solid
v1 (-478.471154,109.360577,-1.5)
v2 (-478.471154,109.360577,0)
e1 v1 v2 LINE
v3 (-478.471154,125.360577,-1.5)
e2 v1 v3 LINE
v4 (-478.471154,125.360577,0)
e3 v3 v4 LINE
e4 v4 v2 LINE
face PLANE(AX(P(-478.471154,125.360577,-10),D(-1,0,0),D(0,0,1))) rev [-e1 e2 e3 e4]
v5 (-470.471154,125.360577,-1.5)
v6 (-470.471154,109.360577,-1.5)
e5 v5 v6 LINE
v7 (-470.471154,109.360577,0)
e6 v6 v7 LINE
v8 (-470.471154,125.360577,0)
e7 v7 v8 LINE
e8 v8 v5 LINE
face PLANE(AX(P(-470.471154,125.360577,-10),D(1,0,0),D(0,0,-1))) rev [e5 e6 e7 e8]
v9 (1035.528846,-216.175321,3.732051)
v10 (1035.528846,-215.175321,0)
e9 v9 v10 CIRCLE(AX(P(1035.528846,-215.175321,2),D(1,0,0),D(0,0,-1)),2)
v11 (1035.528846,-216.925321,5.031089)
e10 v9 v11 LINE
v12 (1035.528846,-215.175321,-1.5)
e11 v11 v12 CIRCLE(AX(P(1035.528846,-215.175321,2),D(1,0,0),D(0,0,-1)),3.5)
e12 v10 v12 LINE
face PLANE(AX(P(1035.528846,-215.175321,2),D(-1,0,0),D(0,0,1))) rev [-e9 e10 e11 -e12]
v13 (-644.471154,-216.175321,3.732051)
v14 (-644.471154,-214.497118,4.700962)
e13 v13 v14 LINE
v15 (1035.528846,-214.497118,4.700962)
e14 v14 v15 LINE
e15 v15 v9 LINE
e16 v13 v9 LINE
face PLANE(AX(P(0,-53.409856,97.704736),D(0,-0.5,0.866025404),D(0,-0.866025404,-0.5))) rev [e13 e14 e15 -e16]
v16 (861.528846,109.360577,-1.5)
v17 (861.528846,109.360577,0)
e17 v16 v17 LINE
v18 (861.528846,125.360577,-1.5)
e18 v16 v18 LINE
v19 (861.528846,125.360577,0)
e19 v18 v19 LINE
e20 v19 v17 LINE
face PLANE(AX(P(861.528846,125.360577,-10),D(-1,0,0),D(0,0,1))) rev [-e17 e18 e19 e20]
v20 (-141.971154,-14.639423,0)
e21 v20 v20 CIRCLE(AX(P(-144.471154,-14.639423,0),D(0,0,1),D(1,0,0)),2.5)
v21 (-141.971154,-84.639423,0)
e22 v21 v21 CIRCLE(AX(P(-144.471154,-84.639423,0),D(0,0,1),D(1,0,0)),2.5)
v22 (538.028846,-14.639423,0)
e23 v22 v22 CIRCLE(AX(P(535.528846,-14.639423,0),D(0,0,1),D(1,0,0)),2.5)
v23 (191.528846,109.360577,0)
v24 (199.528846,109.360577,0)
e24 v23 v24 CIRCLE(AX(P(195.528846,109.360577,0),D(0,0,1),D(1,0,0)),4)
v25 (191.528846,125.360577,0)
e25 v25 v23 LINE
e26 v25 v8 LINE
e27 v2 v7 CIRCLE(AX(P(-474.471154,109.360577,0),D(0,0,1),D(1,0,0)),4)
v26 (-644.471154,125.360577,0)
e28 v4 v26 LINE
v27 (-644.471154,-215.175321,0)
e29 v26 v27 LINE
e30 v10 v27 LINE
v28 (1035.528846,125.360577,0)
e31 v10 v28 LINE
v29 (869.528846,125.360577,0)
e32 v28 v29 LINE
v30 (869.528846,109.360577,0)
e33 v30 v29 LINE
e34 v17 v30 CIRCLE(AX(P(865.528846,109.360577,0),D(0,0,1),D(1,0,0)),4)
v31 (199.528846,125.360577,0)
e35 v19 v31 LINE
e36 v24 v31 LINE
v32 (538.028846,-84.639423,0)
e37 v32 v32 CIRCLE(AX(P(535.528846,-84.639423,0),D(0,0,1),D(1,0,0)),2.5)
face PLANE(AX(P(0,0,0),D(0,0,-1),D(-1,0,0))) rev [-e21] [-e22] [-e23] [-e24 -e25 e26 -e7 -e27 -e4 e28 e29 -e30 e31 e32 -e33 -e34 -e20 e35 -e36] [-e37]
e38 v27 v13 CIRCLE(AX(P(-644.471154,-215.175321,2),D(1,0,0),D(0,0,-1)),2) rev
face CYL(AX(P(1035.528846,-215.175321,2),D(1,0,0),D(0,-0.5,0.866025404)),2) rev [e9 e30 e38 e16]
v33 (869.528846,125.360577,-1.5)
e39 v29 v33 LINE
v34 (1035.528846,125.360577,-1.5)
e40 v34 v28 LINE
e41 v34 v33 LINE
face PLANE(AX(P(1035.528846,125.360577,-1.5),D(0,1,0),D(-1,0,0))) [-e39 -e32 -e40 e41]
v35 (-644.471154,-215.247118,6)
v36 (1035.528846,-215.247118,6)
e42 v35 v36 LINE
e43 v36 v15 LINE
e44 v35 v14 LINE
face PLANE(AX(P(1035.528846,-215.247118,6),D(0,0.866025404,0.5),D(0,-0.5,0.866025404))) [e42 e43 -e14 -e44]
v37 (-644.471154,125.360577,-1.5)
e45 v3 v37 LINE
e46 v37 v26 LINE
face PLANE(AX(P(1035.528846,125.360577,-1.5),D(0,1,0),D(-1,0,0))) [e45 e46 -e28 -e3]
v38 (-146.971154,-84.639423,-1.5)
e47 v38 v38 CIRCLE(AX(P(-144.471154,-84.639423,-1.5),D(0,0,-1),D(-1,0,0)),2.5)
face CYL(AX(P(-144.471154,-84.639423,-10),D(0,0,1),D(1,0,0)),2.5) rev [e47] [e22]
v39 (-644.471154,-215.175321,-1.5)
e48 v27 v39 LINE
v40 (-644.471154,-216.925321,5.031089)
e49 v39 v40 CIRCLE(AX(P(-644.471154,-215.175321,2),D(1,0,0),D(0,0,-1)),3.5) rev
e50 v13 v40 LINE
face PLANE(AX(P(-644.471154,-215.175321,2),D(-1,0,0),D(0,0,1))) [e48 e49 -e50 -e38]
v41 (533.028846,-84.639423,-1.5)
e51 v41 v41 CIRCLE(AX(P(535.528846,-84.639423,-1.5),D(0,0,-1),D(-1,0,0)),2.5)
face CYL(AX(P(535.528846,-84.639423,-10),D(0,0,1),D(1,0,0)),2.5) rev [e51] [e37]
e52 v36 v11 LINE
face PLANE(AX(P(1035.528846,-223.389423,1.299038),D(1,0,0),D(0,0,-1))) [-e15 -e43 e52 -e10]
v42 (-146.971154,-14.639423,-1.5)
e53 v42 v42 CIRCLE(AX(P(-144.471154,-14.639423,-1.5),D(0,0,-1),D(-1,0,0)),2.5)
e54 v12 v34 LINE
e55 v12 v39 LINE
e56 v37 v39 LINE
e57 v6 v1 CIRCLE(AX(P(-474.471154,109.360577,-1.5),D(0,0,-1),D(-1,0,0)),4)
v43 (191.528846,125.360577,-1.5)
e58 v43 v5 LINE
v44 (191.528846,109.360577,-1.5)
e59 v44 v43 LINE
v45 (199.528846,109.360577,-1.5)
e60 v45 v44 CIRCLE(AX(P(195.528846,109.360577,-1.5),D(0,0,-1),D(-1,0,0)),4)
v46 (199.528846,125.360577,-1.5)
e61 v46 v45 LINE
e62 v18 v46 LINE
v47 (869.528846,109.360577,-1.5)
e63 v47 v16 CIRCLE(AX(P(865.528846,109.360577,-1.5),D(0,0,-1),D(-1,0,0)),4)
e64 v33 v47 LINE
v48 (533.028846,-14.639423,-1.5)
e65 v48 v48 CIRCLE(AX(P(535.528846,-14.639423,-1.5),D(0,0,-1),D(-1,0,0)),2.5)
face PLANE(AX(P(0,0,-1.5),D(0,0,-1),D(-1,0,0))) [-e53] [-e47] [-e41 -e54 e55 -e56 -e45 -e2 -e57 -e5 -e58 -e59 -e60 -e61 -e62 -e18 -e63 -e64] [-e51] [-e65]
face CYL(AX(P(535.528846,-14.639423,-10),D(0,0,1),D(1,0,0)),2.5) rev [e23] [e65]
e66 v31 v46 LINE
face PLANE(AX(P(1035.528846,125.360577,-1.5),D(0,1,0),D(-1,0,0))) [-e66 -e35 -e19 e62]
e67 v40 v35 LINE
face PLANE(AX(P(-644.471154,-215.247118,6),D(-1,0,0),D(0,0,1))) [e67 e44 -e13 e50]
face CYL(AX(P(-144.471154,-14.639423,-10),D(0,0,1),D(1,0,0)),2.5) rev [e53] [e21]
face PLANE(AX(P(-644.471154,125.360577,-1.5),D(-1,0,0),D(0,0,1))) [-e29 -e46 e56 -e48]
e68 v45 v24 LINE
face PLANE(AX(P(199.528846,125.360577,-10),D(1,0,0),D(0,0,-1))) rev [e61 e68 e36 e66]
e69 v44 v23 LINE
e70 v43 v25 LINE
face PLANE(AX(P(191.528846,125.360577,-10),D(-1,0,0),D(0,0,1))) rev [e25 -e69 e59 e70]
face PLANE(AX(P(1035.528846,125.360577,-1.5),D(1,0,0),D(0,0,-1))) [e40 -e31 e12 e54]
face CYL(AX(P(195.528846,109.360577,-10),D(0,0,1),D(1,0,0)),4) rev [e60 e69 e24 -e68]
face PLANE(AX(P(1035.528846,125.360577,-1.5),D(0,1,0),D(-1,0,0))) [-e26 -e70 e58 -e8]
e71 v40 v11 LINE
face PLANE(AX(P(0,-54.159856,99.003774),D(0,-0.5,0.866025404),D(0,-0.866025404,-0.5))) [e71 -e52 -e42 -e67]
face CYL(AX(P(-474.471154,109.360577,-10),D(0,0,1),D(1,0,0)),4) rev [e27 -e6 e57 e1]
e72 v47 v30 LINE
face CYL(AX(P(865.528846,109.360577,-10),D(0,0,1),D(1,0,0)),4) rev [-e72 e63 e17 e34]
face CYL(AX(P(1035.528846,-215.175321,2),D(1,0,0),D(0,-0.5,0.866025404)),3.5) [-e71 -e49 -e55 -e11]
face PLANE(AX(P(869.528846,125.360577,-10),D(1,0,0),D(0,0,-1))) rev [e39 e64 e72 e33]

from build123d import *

# Parameters (mm, degrees)
SKETCH1_W            = 1680
SKETCH1_H            = 351
BASE_FLANGE1_DEPTH   = 1.5
EDGE_FLANGE1_START   = -644.471153846
EDGE_FLANGE1_DEPTH   = 1680
EDGE_FLANGE1_2_DEPTH = 1680
SKETCH9_R            = 2.5
CUT_EXTRUDE1_DEPTH   = 10


# Read off the part's stored shape, not the designer's step: Edge-Flange1
# Sheet-metal steps are written as plain solids
with BuildPart() as part:
    # Sketch1 → Base-Flange1 (new body)
    with BuildSketch(Plane.XY):
        with Locations((195.528846154, -50.139423077)):
            Rectangle(SKETCH1_W, SKETCH1_H)
    extrude(amount=-BASE_FLANGE1_DEPTH)

    # Edge-Flange1 outline → Edge-Flange1 (cut)
    with BuildSketch(Plane.YZ.offset(EDGE_FLANGE1_START)):
        with BuildLine():
            ThreePointArc((-215.175321462, -1.5), (-216.795506637, -1.102418412), (-218.047602785, 0))
            Line((-218.047602785, 0), (-225.639423077, 0))
            Line((-225.639423077, 0), (-225.639423077, -1.5))
            Line((-225.639423077, -1.5), (-215.175321462, -1.5))
        make_face()
    extrude(amount=EDGE_FLANGE1_DEPTH, mode=Mode.SUBTRACT)

    # Edge-Flange1 2 outline → Edge-Flange1 2 (add)
    with BuildSketch(Plane.YZ.offset(EDGE_FLANGE1_START)):
        with BuildLine():
            Line((-215.247118232, 6), (-216.925321462, 5.031088913))
            ThreePointArc((-216.925321462, 5.031088913), (-218.591362309, 2.762013733), (-218.047602785, 0))
            Line((-218.047602785, 0), (-215.175321462, 0))
            ThreePointArc((-215.175321462, 0), (-217.107173114, 1.48236191), (-216.175321462, 3.732050808))
            Line((-216.175321462, 3.732050808), (-214.497118232, 4.700961894))
            Line((-214.497118232, 4.700961894), (-215.247118232, 6))
        make_face()
    extrude(amount=EDGE_FLANGE1_2_DEPTH)

    # Sketch9 → Cut-Extrude1 (cut)
    with BuildSketch(Plane.XY):
        with Locations((-144.471153846, -14.639423077)):
            Circle(SKETCH9_R)
        with Locations((-144.471153846, -84.639423077)):
            Circle(SKETCH9_R)
        with Locations((535.528846154, -84.639423077)):
            Circle(SKETCH9_R)
        with Locations((535.528846154, -14.639423077)):
            Circle(SKETCH9_R)
        with BuildLine():
            Line((869.528846154, 125.360576923), (869.528846154, 109.360576923))
            ThreePointArc((869.528846154, 109.360576923), (865.528846154, 105.360576923), (861.528846154, 109.360576923))
            Line((861.528846154, 109.360576923), (861.528846154, 125.360576923))
            ThreePointArc((861.528846154, 125.360576923), (865.528846154, 129.360576923), (869.528846154, 125.360576923))
        make_face()
        with BuildLine():
            Line((199.528846154, 125.360576923), (199.528846154, 109.360576923))
            ThreePointArc((199.528846154, 109.360576923), (195.528846154, 105.360576923), (191.528846154, 109.360576923))
            Line((191.528846154, 109.360576923), (191.528846154, 125.360576923))
            ThreePointArc((191.528846154, 125.360576923), (195.528846154, 129.360576923), (199.528846154, 125.360576923))
        make_face()
        with BuildLine():
            Line((-470.471153846, 125.360576923), (-470.471153846, 109.360576923))
            ThreePointArc((-470.471153846, 109.360576923), (-474.471153846, 105.360576923), (-478.471153846, 109.360576923))
            Line((-478.471153846, 109.360576923), (-478.471153846, 125.360576923))
            ThreePointArc((-478.471153846, 125.360576923), (-474.471153846, 129.360576923), (-470.471153846, 125.360576923))
        make_face()
    extrude(amount=-CUT_EXTRUDE1_DEPTH, mode=Mode.SUBTRACT)


solid = part.part
